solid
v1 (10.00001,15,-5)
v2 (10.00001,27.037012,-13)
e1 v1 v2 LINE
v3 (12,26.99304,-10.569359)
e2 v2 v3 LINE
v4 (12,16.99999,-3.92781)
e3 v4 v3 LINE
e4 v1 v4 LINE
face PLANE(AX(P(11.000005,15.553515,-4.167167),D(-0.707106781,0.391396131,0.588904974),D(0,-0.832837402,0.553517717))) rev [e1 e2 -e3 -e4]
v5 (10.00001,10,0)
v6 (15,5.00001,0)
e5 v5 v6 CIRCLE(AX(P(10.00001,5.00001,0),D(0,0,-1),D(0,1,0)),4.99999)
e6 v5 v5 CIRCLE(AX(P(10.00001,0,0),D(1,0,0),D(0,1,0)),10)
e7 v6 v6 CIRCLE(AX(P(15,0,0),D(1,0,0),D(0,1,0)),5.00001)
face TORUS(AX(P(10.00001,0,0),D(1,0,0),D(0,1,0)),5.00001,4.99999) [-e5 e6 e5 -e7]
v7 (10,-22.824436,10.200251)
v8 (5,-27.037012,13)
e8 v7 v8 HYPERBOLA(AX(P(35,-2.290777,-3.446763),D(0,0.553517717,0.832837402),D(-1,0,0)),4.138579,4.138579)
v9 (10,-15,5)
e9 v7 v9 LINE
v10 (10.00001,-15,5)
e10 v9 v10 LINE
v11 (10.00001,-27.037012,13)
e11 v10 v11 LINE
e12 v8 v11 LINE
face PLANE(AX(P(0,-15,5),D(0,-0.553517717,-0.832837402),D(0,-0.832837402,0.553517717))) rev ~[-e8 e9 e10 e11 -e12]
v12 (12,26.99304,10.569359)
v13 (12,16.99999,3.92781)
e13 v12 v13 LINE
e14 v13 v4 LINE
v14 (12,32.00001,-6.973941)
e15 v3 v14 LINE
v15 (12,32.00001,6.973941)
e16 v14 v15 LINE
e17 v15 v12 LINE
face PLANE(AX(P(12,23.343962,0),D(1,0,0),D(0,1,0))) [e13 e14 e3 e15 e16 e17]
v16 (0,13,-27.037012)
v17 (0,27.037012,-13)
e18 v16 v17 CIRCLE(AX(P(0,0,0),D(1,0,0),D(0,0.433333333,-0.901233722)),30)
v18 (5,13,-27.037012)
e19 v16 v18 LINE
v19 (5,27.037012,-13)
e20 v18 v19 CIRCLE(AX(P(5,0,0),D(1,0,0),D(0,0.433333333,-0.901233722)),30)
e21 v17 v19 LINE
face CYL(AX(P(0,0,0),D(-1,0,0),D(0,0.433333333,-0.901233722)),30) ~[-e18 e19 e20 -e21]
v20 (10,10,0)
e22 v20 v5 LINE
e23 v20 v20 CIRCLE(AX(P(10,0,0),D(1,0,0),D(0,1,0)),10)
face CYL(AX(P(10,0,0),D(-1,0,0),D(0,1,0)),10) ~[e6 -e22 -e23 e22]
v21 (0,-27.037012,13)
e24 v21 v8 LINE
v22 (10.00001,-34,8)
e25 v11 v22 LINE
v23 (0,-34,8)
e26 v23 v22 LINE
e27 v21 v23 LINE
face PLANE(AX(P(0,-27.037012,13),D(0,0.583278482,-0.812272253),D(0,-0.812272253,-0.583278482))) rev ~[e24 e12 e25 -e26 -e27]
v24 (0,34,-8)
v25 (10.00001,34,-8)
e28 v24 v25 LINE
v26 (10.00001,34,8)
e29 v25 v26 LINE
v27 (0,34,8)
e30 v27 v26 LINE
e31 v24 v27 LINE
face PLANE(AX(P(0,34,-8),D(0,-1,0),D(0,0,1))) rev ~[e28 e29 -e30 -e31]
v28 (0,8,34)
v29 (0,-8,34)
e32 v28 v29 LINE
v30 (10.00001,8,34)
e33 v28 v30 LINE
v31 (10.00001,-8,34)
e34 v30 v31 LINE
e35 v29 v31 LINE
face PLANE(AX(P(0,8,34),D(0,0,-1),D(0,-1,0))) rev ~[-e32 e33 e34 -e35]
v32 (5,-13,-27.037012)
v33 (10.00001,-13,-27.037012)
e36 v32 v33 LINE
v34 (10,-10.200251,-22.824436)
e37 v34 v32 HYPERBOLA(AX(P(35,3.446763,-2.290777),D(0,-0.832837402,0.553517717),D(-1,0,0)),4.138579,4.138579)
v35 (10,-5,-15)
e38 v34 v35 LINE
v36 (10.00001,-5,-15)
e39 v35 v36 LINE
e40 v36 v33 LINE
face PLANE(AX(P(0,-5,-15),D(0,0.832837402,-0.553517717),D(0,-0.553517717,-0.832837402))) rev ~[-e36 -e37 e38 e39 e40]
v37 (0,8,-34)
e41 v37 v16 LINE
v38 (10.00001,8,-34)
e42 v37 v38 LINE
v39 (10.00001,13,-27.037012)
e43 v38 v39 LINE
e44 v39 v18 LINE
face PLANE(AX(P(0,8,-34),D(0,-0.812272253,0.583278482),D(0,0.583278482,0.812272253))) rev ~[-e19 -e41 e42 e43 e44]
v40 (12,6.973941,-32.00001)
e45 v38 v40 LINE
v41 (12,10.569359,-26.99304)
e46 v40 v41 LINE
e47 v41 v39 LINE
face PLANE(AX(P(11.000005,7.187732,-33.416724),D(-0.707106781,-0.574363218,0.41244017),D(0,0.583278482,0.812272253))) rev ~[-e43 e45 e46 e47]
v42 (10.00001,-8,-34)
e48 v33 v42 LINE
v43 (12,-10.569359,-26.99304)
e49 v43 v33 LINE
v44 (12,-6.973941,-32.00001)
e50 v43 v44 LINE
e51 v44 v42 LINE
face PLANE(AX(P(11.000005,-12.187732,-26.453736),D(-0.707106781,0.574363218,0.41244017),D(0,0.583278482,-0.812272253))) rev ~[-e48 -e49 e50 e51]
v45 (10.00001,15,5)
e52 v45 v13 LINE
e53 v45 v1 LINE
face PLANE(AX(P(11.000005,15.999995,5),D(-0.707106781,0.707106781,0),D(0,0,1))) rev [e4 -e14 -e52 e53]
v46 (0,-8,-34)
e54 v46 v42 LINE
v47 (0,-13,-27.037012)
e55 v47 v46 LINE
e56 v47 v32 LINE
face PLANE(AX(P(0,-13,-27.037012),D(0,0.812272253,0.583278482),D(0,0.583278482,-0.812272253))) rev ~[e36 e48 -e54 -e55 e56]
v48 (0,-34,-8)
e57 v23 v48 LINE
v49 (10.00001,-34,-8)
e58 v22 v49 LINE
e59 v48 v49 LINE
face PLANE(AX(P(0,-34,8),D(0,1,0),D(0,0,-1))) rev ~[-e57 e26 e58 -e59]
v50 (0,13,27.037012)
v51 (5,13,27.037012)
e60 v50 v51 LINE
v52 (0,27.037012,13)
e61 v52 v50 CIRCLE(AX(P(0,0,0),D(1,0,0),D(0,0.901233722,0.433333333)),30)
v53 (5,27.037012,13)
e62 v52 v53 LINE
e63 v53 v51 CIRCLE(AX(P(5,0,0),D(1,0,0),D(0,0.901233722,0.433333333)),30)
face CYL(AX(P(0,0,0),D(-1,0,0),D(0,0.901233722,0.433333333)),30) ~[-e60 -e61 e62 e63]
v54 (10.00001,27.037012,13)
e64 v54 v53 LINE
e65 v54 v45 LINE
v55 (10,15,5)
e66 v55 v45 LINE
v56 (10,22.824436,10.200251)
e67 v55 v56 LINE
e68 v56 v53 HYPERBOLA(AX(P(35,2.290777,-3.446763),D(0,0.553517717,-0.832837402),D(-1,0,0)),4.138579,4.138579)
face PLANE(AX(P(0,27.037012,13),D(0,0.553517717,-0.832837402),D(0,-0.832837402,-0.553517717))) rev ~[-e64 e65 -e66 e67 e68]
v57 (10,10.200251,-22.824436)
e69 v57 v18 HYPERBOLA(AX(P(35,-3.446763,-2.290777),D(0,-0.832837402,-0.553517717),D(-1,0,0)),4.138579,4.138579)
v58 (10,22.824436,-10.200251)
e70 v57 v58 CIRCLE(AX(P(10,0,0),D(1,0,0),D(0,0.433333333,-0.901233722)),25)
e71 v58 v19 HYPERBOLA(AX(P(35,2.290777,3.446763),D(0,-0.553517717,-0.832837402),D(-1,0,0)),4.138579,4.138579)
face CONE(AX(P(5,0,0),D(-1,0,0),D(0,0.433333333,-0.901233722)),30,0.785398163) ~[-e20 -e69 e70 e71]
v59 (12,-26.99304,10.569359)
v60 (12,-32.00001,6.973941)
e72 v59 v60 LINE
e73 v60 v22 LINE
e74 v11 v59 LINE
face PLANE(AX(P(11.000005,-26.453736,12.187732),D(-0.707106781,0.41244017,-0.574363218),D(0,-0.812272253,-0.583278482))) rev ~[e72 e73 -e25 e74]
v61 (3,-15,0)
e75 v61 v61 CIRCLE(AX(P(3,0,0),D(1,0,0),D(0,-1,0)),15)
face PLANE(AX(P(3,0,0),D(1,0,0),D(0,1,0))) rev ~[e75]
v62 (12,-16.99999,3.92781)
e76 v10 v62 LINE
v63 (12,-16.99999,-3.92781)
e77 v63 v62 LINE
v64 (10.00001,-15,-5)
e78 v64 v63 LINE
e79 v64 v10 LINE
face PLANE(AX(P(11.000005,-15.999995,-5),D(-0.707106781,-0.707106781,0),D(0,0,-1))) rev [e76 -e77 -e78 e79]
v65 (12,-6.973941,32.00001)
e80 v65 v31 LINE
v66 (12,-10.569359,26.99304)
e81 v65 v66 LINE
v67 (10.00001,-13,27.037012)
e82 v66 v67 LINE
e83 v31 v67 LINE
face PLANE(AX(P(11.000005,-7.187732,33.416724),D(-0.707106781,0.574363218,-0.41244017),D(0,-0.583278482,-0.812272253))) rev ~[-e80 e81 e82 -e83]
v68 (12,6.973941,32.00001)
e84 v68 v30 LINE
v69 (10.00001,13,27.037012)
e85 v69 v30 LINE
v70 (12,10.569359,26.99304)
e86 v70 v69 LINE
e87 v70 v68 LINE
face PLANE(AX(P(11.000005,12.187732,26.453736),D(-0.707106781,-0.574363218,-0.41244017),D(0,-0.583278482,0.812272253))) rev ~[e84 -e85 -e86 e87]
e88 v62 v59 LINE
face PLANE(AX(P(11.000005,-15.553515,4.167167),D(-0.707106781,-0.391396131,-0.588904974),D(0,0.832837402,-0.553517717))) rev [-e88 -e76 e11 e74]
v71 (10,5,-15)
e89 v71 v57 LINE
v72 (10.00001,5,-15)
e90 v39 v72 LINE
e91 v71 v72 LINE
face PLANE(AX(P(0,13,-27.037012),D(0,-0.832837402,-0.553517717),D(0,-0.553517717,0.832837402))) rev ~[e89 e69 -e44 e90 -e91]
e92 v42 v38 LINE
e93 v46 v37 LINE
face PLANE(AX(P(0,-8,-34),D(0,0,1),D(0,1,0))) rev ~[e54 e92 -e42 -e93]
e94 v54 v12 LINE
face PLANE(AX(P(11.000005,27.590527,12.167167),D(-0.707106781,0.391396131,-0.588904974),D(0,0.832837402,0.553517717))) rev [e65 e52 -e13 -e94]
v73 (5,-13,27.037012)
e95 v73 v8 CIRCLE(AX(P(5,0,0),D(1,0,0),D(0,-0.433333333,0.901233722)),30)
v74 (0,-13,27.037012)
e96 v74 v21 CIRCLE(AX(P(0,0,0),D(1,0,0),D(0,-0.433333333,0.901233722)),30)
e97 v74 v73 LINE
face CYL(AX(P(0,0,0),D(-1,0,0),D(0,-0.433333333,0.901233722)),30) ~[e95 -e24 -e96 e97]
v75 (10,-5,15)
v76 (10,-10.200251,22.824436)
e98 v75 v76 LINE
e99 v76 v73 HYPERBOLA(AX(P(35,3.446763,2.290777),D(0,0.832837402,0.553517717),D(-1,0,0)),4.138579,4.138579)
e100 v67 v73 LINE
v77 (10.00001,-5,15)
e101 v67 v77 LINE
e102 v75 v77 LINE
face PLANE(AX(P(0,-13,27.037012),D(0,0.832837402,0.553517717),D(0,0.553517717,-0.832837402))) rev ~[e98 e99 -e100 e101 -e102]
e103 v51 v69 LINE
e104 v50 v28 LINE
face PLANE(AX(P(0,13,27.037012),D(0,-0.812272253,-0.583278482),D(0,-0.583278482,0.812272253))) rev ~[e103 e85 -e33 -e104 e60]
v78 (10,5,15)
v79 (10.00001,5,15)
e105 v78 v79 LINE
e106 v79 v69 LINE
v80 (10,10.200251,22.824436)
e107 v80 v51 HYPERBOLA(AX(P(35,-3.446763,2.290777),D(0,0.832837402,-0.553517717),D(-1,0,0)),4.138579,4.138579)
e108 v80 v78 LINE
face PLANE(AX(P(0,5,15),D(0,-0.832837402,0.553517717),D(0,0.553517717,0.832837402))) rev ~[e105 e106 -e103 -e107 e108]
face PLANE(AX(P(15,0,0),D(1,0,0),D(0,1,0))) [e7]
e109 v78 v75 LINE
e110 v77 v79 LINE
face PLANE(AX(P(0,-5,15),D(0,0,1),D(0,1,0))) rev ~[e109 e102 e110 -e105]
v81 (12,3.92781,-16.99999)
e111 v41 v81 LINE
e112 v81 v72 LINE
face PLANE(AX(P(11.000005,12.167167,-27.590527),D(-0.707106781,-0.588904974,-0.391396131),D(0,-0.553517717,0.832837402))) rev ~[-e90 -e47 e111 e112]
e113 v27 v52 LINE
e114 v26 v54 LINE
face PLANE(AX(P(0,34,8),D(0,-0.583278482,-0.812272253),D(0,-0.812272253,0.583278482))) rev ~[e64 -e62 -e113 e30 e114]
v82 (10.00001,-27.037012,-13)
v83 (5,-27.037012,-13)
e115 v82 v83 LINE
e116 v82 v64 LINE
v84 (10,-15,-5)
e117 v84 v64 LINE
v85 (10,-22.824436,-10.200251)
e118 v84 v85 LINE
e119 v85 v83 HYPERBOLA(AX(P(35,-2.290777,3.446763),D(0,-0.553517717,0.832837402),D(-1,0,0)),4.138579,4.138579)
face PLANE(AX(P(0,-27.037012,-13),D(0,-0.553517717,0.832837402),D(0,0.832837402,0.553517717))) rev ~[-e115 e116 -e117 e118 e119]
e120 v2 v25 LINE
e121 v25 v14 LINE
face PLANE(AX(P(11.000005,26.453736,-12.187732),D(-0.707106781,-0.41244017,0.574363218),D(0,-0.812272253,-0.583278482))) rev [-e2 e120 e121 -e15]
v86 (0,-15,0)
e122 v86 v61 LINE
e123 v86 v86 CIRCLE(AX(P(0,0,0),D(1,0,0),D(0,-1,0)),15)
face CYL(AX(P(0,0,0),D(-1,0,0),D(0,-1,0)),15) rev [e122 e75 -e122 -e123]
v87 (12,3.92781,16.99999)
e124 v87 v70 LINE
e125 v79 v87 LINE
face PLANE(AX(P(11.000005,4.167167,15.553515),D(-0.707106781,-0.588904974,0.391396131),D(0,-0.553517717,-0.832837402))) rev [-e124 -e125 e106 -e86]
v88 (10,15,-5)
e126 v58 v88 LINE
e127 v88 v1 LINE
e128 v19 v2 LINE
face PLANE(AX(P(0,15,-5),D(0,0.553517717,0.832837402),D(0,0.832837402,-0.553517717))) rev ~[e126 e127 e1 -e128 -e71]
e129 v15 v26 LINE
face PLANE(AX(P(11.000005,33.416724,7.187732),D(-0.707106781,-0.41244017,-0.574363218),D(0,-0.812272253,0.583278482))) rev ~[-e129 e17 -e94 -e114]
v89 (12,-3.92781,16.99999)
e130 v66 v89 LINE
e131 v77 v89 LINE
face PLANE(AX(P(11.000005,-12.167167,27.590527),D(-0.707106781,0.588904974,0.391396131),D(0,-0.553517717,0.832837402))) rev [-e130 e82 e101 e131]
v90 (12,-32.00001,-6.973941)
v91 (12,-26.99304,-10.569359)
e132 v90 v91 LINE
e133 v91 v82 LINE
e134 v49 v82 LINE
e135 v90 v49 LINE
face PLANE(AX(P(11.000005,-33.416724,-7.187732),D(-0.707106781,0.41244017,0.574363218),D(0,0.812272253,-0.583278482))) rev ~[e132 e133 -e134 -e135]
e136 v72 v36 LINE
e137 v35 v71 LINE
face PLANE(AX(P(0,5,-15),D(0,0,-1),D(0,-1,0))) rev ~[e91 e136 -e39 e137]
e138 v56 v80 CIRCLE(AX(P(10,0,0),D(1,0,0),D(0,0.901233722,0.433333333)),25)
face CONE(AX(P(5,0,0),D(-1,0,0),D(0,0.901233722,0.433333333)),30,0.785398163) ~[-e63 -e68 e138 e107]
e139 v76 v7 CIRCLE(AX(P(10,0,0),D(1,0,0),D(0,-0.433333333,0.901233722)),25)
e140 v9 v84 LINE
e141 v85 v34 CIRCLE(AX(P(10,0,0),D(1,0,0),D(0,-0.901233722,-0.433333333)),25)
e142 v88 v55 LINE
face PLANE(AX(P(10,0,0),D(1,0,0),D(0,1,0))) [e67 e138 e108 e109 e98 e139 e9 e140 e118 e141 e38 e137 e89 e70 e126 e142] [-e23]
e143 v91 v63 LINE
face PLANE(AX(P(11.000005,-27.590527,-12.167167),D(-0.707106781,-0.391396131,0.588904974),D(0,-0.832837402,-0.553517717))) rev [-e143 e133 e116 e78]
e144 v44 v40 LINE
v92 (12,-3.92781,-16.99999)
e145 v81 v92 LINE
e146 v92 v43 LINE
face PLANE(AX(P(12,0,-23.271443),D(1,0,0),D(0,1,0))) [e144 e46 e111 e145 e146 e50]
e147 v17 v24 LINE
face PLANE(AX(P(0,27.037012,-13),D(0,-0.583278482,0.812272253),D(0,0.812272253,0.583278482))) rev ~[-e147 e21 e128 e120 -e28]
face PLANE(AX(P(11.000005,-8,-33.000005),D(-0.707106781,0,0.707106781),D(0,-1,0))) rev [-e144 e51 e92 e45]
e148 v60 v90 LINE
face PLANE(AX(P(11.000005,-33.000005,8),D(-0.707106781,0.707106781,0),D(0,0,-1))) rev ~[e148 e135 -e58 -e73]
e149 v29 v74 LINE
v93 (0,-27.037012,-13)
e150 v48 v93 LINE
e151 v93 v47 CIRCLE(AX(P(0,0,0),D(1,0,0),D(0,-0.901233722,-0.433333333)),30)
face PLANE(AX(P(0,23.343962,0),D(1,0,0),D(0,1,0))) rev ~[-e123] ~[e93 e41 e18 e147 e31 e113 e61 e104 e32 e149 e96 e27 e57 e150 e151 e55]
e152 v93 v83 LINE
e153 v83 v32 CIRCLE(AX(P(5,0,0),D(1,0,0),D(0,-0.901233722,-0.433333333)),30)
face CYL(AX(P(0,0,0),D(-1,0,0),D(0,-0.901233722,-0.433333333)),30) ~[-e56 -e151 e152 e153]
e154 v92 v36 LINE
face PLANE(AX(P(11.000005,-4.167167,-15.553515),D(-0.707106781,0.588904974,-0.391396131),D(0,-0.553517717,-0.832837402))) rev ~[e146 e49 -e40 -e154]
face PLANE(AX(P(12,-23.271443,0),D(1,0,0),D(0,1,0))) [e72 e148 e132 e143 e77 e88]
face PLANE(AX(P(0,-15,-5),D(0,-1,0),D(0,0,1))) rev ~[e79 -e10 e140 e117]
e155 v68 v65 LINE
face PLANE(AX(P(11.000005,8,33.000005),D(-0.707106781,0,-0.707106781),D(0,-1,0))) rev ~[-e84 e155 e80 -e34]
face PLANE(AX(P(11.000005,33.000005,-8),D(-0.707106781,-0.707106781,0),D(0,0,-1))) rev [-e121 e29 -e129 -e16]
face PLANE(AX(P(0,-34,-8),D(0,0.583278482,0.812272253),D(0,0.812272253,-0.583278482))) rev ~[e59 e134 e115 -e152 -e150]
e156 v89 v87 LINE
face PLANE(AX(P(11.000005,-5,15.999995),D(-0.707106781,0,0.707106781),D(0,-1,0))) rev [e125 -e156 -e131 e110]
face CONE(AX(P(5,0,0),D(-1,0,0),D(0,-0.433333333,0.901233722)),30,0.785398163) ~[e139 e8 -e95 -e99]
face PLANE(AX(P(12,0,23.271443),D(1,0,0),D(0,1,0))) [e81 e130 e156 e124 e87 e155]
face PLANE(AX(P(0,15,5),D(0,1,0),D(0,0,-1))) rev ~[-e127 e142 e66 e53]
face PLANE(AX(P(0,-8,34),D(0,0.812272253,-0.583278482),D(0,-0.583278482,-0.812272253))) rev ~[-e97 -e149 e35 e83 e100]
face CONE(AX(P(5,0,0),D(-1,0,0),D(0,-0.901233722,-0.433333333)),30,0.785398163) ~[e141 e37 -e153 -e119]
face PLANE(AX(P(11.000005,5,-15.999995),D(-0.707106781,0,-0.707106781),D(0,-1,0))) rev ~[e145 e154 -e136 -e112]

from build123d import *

# Parameters (mm, degrees)
F1_DEPTH = 10
F2_DEPTH = 12
F3_SIZE  = 5
F4_SIZE  = 1.99999
F5_R     = 10
F6_DEPTH = 5
F7_R     = 4.99999
F9_DEPTH = 3


# Not quite as in the source:
# - a fillet or chamfer is up to 0.001 mm smaller than in the source, because OpenCascade refuses the exact size


with BuildPart() as f1:
    # F0 (on Right) → F1 (new body)
    with BuildSketch(Plane.YZ):
        with BuildLine():
            Line((15, 5), (27.0370116692, 13))
            ThreePointArc((27.0370116692, 13), (21.2132034356, 21.2132034356), (13, 27.0370116692))
            Line((13, 27.0370116692), (5, 15))
            Line((5, 15), (0, 15))
            Line((0, 15), (-5, 15))
            Line((-5, 15), (-13, 27.0370116692))
            ThreePointArc((-13, 27.0370116692), (-21.2132034356, 21.2132034356), (-27.0370116692, 13))
            Line((-27.0370116692, 13), (-15, 5))
            Line((-15, 5), (-15, 0))
            Line((-15, 0), (-15, -5))
            Line((-15, -5), (-27.0370116692, -13))
            ThreePointArc((-27.0370116692, -13), (-21.2132034356, -21.2132034356), (-13, -27.0370116692))
            Line((-13, -27.0370116692), (-5, -15))
            Line((-5, -15), (0, -15))
            Line((0, -15), (5, -15))
            Line((5, -15), (13, -27.0370116692))
            ThreePointArc((13, -27.0370116692), (21.2132034356, -21.2132034356), (27.0370116692, -13))
            Line((27.0370116692, -13), (15, -5))
            Line((15, -5), (15, 0))
            Line((15, 0), (15, 5))
        make_face()
    extrude(amount=F1_DEPTH)

    # F0 (on Right) → F2 (join)
    with BuildSketch(Plane.YZ):
        with BuildLine():
            ThreePointArc((27.0370116692, -13), (29.2498747867, -6.6666952054), (30, 0))
            ThreePointArc((30, 0), (29.2498747867, 6.6666952054), (27.0370116692, 13))
            Line((27.0370116692, 13), (15, 5))
            Line((15, 5), (15, 0))
            Line((15, 0), (15, -5))
            Line((15, -5), (27.0370116692, -13))
        make_face()
        with BuildLine():
            ThreePointArc((27.0370116692, 13), (29.2498747867, 6.6666952054), (30, 0))
            ThreePointArc((30, 0), (29.2498747867, -6.6666952054), (27.0370116692, -13))
            Line((27.0370116692, -13), (34, -8))
            Line((34, -8), (34, 0))
            Line((34, 0), (34, 8))
            Line((34, 8), (27.0370116692, 13))
        make_face()
        with BuildLine():
            Line((5, 15), (13, 27.0370116692))
            ThreePointArc((13, 27.0370116692), (0, 30), (-13, 27.0370116692))
            Line((-13, 27.0370116692), (-5, 15))
            Line((-5, 15), (0, 15))
            Line((0, 15), (5, 15))
        make_face()
        with BuildLine():
            ThreePointArc((-13, 27.0370116692), (0, 30), (13, 27.0370116692))
            Line((13, 27.0370116692), (8, 34))
            Line((8, 34), (0, 34))
            Line((0, 34), (-8, 34))
            Line((-8, 34), (-13, 27.0370116692))
        make_face()
        with BuildLine():
            Line((-15, 5), (-27.0370116692, 13))
            ThreePointArc((-27.0370116692, 13), (-30, 0), (-27.0370116692, -13))
            Line((-27.0370116692, -13), (-15, -5))
            Line((-15, -5), (-15, 0))
            Line((-15, 0), (-15, 5))
        make_face()
        with BuildLine():
            ThreePointArc((-27.0370116692, -13), (-30, 0), (-27.0370116692, 13))
            Line((-27.0370116692, 13), (-34, 8))
            Line((-34, 8), (-34, 0))
            Line((-34, 0), (-34, -8))
            Line((-34, -8), (-27.0370116692, -13))
        make_face()
        with BuildLine():
            ThreePointArc((-13, -27.0370116692), (0, -30), (13, -27.0370116692))
            Line((13, -27.0370116692), (5, -15))
            Line((5, -15), (0, -15))
            Line((0, -15), (-5, -15))
            Line((-5, -15), (-13, -27.0370116692))
        make_face()
        with BuildLine():
            Line((8, -34), (13, -27.0370116692))
            ThreePointArc((13, -27.0370116692), (0, -30), (-13, -27.0370116692))
            Line((-13, -27.0370116692), (-8, -34))
            Line((-8, -34), (0, -34))
            Line((0, -34), (8, -34))
        make_face()
    extrude(amount=F2_DEPTH)

    # F3
    f3_edges = [f1.edges().sort_by_distance(p)[0] for p in [
        (10, 21.213203, 21.213203),
        (10, -21.213203, 21.213203),
        (10, -21.213203, -21.213203),
        (10, 21.213203, -21.213203),
    ]]
    chamfer(f3_edges, length=F3_SIZE)

    # F4 (size 2 in the source; OpenCascade refuses exactly that, so slightly less here)
    f4_edges = [f1.edges().sort_by_distance(p)[0] for p in [
        (12, 0, 34),
        (12, -10.5, 30.518506),
        (12, 10.5, 30.518506),
        (12, -9, 21.018506),
        (12, 9, 21.018506),
        (12, 0, 15),
        (12, -15, 0),
        (12, -21.018506, 9),
        (12, -30.518506, 10.5),
        (12, -34, 0),
        (12, -30.518506, -10.5),
        (12, -21.018506, -9),
        (12, 0, -15),
        (12, -9, -21.018506),
        (12, -10.5, -30.518506),
        (12, 0, -34),
        (12, 10.5, -30.518506),
        (12, 9, -21.018506),
        (12, 15, 0),
        (12, 21.018506, 9),
        (12, 30.518506, 10.5),
        (12, 34, 0),
        (12, 21.018506, -9),
        (12, 30.518506, -10.5),
    ]]
    chamfer(f4_edges, length=F4_SIZE)

    # F5 (on face) → F6 (join)
    with BuildSketch(Plane.YZ.offset(10)):
        Circle(F5_R)
    extrude(amount=F6_DEPTH)

    # F7 (radius 5 in the source; OpenCascade refuses exactly that, so slightly less here)
    f7_edges = [f1.edges().sort_by_distance(p)[0] for p in [
        (15, -10, 0),
    ]]
    fillet(f7_edges, radius=F7_R)

    # F8 (on face) → F9 (cut)
    with BuildSketch(Plane.YZ):
        with BuildLine():
            ThreePointArc((0, -15), (10.6066017178, -10.6066017178), (15, 0))
            ThreePointArc((15, 0), (10.6066017178, 10.6066017178), (0, 15))
            ThreePointArc((0, 15), (-10.6066017178, 10.6066017178), (-15, 0))
            ThreePointArc((-15, 0), (-10.6066017178, -10.6066017178), (0, -15))
        make_face()
    extrude(amount=F9_DEPTH, mode=Mode.SUBTRACT)


solid = f1.part
